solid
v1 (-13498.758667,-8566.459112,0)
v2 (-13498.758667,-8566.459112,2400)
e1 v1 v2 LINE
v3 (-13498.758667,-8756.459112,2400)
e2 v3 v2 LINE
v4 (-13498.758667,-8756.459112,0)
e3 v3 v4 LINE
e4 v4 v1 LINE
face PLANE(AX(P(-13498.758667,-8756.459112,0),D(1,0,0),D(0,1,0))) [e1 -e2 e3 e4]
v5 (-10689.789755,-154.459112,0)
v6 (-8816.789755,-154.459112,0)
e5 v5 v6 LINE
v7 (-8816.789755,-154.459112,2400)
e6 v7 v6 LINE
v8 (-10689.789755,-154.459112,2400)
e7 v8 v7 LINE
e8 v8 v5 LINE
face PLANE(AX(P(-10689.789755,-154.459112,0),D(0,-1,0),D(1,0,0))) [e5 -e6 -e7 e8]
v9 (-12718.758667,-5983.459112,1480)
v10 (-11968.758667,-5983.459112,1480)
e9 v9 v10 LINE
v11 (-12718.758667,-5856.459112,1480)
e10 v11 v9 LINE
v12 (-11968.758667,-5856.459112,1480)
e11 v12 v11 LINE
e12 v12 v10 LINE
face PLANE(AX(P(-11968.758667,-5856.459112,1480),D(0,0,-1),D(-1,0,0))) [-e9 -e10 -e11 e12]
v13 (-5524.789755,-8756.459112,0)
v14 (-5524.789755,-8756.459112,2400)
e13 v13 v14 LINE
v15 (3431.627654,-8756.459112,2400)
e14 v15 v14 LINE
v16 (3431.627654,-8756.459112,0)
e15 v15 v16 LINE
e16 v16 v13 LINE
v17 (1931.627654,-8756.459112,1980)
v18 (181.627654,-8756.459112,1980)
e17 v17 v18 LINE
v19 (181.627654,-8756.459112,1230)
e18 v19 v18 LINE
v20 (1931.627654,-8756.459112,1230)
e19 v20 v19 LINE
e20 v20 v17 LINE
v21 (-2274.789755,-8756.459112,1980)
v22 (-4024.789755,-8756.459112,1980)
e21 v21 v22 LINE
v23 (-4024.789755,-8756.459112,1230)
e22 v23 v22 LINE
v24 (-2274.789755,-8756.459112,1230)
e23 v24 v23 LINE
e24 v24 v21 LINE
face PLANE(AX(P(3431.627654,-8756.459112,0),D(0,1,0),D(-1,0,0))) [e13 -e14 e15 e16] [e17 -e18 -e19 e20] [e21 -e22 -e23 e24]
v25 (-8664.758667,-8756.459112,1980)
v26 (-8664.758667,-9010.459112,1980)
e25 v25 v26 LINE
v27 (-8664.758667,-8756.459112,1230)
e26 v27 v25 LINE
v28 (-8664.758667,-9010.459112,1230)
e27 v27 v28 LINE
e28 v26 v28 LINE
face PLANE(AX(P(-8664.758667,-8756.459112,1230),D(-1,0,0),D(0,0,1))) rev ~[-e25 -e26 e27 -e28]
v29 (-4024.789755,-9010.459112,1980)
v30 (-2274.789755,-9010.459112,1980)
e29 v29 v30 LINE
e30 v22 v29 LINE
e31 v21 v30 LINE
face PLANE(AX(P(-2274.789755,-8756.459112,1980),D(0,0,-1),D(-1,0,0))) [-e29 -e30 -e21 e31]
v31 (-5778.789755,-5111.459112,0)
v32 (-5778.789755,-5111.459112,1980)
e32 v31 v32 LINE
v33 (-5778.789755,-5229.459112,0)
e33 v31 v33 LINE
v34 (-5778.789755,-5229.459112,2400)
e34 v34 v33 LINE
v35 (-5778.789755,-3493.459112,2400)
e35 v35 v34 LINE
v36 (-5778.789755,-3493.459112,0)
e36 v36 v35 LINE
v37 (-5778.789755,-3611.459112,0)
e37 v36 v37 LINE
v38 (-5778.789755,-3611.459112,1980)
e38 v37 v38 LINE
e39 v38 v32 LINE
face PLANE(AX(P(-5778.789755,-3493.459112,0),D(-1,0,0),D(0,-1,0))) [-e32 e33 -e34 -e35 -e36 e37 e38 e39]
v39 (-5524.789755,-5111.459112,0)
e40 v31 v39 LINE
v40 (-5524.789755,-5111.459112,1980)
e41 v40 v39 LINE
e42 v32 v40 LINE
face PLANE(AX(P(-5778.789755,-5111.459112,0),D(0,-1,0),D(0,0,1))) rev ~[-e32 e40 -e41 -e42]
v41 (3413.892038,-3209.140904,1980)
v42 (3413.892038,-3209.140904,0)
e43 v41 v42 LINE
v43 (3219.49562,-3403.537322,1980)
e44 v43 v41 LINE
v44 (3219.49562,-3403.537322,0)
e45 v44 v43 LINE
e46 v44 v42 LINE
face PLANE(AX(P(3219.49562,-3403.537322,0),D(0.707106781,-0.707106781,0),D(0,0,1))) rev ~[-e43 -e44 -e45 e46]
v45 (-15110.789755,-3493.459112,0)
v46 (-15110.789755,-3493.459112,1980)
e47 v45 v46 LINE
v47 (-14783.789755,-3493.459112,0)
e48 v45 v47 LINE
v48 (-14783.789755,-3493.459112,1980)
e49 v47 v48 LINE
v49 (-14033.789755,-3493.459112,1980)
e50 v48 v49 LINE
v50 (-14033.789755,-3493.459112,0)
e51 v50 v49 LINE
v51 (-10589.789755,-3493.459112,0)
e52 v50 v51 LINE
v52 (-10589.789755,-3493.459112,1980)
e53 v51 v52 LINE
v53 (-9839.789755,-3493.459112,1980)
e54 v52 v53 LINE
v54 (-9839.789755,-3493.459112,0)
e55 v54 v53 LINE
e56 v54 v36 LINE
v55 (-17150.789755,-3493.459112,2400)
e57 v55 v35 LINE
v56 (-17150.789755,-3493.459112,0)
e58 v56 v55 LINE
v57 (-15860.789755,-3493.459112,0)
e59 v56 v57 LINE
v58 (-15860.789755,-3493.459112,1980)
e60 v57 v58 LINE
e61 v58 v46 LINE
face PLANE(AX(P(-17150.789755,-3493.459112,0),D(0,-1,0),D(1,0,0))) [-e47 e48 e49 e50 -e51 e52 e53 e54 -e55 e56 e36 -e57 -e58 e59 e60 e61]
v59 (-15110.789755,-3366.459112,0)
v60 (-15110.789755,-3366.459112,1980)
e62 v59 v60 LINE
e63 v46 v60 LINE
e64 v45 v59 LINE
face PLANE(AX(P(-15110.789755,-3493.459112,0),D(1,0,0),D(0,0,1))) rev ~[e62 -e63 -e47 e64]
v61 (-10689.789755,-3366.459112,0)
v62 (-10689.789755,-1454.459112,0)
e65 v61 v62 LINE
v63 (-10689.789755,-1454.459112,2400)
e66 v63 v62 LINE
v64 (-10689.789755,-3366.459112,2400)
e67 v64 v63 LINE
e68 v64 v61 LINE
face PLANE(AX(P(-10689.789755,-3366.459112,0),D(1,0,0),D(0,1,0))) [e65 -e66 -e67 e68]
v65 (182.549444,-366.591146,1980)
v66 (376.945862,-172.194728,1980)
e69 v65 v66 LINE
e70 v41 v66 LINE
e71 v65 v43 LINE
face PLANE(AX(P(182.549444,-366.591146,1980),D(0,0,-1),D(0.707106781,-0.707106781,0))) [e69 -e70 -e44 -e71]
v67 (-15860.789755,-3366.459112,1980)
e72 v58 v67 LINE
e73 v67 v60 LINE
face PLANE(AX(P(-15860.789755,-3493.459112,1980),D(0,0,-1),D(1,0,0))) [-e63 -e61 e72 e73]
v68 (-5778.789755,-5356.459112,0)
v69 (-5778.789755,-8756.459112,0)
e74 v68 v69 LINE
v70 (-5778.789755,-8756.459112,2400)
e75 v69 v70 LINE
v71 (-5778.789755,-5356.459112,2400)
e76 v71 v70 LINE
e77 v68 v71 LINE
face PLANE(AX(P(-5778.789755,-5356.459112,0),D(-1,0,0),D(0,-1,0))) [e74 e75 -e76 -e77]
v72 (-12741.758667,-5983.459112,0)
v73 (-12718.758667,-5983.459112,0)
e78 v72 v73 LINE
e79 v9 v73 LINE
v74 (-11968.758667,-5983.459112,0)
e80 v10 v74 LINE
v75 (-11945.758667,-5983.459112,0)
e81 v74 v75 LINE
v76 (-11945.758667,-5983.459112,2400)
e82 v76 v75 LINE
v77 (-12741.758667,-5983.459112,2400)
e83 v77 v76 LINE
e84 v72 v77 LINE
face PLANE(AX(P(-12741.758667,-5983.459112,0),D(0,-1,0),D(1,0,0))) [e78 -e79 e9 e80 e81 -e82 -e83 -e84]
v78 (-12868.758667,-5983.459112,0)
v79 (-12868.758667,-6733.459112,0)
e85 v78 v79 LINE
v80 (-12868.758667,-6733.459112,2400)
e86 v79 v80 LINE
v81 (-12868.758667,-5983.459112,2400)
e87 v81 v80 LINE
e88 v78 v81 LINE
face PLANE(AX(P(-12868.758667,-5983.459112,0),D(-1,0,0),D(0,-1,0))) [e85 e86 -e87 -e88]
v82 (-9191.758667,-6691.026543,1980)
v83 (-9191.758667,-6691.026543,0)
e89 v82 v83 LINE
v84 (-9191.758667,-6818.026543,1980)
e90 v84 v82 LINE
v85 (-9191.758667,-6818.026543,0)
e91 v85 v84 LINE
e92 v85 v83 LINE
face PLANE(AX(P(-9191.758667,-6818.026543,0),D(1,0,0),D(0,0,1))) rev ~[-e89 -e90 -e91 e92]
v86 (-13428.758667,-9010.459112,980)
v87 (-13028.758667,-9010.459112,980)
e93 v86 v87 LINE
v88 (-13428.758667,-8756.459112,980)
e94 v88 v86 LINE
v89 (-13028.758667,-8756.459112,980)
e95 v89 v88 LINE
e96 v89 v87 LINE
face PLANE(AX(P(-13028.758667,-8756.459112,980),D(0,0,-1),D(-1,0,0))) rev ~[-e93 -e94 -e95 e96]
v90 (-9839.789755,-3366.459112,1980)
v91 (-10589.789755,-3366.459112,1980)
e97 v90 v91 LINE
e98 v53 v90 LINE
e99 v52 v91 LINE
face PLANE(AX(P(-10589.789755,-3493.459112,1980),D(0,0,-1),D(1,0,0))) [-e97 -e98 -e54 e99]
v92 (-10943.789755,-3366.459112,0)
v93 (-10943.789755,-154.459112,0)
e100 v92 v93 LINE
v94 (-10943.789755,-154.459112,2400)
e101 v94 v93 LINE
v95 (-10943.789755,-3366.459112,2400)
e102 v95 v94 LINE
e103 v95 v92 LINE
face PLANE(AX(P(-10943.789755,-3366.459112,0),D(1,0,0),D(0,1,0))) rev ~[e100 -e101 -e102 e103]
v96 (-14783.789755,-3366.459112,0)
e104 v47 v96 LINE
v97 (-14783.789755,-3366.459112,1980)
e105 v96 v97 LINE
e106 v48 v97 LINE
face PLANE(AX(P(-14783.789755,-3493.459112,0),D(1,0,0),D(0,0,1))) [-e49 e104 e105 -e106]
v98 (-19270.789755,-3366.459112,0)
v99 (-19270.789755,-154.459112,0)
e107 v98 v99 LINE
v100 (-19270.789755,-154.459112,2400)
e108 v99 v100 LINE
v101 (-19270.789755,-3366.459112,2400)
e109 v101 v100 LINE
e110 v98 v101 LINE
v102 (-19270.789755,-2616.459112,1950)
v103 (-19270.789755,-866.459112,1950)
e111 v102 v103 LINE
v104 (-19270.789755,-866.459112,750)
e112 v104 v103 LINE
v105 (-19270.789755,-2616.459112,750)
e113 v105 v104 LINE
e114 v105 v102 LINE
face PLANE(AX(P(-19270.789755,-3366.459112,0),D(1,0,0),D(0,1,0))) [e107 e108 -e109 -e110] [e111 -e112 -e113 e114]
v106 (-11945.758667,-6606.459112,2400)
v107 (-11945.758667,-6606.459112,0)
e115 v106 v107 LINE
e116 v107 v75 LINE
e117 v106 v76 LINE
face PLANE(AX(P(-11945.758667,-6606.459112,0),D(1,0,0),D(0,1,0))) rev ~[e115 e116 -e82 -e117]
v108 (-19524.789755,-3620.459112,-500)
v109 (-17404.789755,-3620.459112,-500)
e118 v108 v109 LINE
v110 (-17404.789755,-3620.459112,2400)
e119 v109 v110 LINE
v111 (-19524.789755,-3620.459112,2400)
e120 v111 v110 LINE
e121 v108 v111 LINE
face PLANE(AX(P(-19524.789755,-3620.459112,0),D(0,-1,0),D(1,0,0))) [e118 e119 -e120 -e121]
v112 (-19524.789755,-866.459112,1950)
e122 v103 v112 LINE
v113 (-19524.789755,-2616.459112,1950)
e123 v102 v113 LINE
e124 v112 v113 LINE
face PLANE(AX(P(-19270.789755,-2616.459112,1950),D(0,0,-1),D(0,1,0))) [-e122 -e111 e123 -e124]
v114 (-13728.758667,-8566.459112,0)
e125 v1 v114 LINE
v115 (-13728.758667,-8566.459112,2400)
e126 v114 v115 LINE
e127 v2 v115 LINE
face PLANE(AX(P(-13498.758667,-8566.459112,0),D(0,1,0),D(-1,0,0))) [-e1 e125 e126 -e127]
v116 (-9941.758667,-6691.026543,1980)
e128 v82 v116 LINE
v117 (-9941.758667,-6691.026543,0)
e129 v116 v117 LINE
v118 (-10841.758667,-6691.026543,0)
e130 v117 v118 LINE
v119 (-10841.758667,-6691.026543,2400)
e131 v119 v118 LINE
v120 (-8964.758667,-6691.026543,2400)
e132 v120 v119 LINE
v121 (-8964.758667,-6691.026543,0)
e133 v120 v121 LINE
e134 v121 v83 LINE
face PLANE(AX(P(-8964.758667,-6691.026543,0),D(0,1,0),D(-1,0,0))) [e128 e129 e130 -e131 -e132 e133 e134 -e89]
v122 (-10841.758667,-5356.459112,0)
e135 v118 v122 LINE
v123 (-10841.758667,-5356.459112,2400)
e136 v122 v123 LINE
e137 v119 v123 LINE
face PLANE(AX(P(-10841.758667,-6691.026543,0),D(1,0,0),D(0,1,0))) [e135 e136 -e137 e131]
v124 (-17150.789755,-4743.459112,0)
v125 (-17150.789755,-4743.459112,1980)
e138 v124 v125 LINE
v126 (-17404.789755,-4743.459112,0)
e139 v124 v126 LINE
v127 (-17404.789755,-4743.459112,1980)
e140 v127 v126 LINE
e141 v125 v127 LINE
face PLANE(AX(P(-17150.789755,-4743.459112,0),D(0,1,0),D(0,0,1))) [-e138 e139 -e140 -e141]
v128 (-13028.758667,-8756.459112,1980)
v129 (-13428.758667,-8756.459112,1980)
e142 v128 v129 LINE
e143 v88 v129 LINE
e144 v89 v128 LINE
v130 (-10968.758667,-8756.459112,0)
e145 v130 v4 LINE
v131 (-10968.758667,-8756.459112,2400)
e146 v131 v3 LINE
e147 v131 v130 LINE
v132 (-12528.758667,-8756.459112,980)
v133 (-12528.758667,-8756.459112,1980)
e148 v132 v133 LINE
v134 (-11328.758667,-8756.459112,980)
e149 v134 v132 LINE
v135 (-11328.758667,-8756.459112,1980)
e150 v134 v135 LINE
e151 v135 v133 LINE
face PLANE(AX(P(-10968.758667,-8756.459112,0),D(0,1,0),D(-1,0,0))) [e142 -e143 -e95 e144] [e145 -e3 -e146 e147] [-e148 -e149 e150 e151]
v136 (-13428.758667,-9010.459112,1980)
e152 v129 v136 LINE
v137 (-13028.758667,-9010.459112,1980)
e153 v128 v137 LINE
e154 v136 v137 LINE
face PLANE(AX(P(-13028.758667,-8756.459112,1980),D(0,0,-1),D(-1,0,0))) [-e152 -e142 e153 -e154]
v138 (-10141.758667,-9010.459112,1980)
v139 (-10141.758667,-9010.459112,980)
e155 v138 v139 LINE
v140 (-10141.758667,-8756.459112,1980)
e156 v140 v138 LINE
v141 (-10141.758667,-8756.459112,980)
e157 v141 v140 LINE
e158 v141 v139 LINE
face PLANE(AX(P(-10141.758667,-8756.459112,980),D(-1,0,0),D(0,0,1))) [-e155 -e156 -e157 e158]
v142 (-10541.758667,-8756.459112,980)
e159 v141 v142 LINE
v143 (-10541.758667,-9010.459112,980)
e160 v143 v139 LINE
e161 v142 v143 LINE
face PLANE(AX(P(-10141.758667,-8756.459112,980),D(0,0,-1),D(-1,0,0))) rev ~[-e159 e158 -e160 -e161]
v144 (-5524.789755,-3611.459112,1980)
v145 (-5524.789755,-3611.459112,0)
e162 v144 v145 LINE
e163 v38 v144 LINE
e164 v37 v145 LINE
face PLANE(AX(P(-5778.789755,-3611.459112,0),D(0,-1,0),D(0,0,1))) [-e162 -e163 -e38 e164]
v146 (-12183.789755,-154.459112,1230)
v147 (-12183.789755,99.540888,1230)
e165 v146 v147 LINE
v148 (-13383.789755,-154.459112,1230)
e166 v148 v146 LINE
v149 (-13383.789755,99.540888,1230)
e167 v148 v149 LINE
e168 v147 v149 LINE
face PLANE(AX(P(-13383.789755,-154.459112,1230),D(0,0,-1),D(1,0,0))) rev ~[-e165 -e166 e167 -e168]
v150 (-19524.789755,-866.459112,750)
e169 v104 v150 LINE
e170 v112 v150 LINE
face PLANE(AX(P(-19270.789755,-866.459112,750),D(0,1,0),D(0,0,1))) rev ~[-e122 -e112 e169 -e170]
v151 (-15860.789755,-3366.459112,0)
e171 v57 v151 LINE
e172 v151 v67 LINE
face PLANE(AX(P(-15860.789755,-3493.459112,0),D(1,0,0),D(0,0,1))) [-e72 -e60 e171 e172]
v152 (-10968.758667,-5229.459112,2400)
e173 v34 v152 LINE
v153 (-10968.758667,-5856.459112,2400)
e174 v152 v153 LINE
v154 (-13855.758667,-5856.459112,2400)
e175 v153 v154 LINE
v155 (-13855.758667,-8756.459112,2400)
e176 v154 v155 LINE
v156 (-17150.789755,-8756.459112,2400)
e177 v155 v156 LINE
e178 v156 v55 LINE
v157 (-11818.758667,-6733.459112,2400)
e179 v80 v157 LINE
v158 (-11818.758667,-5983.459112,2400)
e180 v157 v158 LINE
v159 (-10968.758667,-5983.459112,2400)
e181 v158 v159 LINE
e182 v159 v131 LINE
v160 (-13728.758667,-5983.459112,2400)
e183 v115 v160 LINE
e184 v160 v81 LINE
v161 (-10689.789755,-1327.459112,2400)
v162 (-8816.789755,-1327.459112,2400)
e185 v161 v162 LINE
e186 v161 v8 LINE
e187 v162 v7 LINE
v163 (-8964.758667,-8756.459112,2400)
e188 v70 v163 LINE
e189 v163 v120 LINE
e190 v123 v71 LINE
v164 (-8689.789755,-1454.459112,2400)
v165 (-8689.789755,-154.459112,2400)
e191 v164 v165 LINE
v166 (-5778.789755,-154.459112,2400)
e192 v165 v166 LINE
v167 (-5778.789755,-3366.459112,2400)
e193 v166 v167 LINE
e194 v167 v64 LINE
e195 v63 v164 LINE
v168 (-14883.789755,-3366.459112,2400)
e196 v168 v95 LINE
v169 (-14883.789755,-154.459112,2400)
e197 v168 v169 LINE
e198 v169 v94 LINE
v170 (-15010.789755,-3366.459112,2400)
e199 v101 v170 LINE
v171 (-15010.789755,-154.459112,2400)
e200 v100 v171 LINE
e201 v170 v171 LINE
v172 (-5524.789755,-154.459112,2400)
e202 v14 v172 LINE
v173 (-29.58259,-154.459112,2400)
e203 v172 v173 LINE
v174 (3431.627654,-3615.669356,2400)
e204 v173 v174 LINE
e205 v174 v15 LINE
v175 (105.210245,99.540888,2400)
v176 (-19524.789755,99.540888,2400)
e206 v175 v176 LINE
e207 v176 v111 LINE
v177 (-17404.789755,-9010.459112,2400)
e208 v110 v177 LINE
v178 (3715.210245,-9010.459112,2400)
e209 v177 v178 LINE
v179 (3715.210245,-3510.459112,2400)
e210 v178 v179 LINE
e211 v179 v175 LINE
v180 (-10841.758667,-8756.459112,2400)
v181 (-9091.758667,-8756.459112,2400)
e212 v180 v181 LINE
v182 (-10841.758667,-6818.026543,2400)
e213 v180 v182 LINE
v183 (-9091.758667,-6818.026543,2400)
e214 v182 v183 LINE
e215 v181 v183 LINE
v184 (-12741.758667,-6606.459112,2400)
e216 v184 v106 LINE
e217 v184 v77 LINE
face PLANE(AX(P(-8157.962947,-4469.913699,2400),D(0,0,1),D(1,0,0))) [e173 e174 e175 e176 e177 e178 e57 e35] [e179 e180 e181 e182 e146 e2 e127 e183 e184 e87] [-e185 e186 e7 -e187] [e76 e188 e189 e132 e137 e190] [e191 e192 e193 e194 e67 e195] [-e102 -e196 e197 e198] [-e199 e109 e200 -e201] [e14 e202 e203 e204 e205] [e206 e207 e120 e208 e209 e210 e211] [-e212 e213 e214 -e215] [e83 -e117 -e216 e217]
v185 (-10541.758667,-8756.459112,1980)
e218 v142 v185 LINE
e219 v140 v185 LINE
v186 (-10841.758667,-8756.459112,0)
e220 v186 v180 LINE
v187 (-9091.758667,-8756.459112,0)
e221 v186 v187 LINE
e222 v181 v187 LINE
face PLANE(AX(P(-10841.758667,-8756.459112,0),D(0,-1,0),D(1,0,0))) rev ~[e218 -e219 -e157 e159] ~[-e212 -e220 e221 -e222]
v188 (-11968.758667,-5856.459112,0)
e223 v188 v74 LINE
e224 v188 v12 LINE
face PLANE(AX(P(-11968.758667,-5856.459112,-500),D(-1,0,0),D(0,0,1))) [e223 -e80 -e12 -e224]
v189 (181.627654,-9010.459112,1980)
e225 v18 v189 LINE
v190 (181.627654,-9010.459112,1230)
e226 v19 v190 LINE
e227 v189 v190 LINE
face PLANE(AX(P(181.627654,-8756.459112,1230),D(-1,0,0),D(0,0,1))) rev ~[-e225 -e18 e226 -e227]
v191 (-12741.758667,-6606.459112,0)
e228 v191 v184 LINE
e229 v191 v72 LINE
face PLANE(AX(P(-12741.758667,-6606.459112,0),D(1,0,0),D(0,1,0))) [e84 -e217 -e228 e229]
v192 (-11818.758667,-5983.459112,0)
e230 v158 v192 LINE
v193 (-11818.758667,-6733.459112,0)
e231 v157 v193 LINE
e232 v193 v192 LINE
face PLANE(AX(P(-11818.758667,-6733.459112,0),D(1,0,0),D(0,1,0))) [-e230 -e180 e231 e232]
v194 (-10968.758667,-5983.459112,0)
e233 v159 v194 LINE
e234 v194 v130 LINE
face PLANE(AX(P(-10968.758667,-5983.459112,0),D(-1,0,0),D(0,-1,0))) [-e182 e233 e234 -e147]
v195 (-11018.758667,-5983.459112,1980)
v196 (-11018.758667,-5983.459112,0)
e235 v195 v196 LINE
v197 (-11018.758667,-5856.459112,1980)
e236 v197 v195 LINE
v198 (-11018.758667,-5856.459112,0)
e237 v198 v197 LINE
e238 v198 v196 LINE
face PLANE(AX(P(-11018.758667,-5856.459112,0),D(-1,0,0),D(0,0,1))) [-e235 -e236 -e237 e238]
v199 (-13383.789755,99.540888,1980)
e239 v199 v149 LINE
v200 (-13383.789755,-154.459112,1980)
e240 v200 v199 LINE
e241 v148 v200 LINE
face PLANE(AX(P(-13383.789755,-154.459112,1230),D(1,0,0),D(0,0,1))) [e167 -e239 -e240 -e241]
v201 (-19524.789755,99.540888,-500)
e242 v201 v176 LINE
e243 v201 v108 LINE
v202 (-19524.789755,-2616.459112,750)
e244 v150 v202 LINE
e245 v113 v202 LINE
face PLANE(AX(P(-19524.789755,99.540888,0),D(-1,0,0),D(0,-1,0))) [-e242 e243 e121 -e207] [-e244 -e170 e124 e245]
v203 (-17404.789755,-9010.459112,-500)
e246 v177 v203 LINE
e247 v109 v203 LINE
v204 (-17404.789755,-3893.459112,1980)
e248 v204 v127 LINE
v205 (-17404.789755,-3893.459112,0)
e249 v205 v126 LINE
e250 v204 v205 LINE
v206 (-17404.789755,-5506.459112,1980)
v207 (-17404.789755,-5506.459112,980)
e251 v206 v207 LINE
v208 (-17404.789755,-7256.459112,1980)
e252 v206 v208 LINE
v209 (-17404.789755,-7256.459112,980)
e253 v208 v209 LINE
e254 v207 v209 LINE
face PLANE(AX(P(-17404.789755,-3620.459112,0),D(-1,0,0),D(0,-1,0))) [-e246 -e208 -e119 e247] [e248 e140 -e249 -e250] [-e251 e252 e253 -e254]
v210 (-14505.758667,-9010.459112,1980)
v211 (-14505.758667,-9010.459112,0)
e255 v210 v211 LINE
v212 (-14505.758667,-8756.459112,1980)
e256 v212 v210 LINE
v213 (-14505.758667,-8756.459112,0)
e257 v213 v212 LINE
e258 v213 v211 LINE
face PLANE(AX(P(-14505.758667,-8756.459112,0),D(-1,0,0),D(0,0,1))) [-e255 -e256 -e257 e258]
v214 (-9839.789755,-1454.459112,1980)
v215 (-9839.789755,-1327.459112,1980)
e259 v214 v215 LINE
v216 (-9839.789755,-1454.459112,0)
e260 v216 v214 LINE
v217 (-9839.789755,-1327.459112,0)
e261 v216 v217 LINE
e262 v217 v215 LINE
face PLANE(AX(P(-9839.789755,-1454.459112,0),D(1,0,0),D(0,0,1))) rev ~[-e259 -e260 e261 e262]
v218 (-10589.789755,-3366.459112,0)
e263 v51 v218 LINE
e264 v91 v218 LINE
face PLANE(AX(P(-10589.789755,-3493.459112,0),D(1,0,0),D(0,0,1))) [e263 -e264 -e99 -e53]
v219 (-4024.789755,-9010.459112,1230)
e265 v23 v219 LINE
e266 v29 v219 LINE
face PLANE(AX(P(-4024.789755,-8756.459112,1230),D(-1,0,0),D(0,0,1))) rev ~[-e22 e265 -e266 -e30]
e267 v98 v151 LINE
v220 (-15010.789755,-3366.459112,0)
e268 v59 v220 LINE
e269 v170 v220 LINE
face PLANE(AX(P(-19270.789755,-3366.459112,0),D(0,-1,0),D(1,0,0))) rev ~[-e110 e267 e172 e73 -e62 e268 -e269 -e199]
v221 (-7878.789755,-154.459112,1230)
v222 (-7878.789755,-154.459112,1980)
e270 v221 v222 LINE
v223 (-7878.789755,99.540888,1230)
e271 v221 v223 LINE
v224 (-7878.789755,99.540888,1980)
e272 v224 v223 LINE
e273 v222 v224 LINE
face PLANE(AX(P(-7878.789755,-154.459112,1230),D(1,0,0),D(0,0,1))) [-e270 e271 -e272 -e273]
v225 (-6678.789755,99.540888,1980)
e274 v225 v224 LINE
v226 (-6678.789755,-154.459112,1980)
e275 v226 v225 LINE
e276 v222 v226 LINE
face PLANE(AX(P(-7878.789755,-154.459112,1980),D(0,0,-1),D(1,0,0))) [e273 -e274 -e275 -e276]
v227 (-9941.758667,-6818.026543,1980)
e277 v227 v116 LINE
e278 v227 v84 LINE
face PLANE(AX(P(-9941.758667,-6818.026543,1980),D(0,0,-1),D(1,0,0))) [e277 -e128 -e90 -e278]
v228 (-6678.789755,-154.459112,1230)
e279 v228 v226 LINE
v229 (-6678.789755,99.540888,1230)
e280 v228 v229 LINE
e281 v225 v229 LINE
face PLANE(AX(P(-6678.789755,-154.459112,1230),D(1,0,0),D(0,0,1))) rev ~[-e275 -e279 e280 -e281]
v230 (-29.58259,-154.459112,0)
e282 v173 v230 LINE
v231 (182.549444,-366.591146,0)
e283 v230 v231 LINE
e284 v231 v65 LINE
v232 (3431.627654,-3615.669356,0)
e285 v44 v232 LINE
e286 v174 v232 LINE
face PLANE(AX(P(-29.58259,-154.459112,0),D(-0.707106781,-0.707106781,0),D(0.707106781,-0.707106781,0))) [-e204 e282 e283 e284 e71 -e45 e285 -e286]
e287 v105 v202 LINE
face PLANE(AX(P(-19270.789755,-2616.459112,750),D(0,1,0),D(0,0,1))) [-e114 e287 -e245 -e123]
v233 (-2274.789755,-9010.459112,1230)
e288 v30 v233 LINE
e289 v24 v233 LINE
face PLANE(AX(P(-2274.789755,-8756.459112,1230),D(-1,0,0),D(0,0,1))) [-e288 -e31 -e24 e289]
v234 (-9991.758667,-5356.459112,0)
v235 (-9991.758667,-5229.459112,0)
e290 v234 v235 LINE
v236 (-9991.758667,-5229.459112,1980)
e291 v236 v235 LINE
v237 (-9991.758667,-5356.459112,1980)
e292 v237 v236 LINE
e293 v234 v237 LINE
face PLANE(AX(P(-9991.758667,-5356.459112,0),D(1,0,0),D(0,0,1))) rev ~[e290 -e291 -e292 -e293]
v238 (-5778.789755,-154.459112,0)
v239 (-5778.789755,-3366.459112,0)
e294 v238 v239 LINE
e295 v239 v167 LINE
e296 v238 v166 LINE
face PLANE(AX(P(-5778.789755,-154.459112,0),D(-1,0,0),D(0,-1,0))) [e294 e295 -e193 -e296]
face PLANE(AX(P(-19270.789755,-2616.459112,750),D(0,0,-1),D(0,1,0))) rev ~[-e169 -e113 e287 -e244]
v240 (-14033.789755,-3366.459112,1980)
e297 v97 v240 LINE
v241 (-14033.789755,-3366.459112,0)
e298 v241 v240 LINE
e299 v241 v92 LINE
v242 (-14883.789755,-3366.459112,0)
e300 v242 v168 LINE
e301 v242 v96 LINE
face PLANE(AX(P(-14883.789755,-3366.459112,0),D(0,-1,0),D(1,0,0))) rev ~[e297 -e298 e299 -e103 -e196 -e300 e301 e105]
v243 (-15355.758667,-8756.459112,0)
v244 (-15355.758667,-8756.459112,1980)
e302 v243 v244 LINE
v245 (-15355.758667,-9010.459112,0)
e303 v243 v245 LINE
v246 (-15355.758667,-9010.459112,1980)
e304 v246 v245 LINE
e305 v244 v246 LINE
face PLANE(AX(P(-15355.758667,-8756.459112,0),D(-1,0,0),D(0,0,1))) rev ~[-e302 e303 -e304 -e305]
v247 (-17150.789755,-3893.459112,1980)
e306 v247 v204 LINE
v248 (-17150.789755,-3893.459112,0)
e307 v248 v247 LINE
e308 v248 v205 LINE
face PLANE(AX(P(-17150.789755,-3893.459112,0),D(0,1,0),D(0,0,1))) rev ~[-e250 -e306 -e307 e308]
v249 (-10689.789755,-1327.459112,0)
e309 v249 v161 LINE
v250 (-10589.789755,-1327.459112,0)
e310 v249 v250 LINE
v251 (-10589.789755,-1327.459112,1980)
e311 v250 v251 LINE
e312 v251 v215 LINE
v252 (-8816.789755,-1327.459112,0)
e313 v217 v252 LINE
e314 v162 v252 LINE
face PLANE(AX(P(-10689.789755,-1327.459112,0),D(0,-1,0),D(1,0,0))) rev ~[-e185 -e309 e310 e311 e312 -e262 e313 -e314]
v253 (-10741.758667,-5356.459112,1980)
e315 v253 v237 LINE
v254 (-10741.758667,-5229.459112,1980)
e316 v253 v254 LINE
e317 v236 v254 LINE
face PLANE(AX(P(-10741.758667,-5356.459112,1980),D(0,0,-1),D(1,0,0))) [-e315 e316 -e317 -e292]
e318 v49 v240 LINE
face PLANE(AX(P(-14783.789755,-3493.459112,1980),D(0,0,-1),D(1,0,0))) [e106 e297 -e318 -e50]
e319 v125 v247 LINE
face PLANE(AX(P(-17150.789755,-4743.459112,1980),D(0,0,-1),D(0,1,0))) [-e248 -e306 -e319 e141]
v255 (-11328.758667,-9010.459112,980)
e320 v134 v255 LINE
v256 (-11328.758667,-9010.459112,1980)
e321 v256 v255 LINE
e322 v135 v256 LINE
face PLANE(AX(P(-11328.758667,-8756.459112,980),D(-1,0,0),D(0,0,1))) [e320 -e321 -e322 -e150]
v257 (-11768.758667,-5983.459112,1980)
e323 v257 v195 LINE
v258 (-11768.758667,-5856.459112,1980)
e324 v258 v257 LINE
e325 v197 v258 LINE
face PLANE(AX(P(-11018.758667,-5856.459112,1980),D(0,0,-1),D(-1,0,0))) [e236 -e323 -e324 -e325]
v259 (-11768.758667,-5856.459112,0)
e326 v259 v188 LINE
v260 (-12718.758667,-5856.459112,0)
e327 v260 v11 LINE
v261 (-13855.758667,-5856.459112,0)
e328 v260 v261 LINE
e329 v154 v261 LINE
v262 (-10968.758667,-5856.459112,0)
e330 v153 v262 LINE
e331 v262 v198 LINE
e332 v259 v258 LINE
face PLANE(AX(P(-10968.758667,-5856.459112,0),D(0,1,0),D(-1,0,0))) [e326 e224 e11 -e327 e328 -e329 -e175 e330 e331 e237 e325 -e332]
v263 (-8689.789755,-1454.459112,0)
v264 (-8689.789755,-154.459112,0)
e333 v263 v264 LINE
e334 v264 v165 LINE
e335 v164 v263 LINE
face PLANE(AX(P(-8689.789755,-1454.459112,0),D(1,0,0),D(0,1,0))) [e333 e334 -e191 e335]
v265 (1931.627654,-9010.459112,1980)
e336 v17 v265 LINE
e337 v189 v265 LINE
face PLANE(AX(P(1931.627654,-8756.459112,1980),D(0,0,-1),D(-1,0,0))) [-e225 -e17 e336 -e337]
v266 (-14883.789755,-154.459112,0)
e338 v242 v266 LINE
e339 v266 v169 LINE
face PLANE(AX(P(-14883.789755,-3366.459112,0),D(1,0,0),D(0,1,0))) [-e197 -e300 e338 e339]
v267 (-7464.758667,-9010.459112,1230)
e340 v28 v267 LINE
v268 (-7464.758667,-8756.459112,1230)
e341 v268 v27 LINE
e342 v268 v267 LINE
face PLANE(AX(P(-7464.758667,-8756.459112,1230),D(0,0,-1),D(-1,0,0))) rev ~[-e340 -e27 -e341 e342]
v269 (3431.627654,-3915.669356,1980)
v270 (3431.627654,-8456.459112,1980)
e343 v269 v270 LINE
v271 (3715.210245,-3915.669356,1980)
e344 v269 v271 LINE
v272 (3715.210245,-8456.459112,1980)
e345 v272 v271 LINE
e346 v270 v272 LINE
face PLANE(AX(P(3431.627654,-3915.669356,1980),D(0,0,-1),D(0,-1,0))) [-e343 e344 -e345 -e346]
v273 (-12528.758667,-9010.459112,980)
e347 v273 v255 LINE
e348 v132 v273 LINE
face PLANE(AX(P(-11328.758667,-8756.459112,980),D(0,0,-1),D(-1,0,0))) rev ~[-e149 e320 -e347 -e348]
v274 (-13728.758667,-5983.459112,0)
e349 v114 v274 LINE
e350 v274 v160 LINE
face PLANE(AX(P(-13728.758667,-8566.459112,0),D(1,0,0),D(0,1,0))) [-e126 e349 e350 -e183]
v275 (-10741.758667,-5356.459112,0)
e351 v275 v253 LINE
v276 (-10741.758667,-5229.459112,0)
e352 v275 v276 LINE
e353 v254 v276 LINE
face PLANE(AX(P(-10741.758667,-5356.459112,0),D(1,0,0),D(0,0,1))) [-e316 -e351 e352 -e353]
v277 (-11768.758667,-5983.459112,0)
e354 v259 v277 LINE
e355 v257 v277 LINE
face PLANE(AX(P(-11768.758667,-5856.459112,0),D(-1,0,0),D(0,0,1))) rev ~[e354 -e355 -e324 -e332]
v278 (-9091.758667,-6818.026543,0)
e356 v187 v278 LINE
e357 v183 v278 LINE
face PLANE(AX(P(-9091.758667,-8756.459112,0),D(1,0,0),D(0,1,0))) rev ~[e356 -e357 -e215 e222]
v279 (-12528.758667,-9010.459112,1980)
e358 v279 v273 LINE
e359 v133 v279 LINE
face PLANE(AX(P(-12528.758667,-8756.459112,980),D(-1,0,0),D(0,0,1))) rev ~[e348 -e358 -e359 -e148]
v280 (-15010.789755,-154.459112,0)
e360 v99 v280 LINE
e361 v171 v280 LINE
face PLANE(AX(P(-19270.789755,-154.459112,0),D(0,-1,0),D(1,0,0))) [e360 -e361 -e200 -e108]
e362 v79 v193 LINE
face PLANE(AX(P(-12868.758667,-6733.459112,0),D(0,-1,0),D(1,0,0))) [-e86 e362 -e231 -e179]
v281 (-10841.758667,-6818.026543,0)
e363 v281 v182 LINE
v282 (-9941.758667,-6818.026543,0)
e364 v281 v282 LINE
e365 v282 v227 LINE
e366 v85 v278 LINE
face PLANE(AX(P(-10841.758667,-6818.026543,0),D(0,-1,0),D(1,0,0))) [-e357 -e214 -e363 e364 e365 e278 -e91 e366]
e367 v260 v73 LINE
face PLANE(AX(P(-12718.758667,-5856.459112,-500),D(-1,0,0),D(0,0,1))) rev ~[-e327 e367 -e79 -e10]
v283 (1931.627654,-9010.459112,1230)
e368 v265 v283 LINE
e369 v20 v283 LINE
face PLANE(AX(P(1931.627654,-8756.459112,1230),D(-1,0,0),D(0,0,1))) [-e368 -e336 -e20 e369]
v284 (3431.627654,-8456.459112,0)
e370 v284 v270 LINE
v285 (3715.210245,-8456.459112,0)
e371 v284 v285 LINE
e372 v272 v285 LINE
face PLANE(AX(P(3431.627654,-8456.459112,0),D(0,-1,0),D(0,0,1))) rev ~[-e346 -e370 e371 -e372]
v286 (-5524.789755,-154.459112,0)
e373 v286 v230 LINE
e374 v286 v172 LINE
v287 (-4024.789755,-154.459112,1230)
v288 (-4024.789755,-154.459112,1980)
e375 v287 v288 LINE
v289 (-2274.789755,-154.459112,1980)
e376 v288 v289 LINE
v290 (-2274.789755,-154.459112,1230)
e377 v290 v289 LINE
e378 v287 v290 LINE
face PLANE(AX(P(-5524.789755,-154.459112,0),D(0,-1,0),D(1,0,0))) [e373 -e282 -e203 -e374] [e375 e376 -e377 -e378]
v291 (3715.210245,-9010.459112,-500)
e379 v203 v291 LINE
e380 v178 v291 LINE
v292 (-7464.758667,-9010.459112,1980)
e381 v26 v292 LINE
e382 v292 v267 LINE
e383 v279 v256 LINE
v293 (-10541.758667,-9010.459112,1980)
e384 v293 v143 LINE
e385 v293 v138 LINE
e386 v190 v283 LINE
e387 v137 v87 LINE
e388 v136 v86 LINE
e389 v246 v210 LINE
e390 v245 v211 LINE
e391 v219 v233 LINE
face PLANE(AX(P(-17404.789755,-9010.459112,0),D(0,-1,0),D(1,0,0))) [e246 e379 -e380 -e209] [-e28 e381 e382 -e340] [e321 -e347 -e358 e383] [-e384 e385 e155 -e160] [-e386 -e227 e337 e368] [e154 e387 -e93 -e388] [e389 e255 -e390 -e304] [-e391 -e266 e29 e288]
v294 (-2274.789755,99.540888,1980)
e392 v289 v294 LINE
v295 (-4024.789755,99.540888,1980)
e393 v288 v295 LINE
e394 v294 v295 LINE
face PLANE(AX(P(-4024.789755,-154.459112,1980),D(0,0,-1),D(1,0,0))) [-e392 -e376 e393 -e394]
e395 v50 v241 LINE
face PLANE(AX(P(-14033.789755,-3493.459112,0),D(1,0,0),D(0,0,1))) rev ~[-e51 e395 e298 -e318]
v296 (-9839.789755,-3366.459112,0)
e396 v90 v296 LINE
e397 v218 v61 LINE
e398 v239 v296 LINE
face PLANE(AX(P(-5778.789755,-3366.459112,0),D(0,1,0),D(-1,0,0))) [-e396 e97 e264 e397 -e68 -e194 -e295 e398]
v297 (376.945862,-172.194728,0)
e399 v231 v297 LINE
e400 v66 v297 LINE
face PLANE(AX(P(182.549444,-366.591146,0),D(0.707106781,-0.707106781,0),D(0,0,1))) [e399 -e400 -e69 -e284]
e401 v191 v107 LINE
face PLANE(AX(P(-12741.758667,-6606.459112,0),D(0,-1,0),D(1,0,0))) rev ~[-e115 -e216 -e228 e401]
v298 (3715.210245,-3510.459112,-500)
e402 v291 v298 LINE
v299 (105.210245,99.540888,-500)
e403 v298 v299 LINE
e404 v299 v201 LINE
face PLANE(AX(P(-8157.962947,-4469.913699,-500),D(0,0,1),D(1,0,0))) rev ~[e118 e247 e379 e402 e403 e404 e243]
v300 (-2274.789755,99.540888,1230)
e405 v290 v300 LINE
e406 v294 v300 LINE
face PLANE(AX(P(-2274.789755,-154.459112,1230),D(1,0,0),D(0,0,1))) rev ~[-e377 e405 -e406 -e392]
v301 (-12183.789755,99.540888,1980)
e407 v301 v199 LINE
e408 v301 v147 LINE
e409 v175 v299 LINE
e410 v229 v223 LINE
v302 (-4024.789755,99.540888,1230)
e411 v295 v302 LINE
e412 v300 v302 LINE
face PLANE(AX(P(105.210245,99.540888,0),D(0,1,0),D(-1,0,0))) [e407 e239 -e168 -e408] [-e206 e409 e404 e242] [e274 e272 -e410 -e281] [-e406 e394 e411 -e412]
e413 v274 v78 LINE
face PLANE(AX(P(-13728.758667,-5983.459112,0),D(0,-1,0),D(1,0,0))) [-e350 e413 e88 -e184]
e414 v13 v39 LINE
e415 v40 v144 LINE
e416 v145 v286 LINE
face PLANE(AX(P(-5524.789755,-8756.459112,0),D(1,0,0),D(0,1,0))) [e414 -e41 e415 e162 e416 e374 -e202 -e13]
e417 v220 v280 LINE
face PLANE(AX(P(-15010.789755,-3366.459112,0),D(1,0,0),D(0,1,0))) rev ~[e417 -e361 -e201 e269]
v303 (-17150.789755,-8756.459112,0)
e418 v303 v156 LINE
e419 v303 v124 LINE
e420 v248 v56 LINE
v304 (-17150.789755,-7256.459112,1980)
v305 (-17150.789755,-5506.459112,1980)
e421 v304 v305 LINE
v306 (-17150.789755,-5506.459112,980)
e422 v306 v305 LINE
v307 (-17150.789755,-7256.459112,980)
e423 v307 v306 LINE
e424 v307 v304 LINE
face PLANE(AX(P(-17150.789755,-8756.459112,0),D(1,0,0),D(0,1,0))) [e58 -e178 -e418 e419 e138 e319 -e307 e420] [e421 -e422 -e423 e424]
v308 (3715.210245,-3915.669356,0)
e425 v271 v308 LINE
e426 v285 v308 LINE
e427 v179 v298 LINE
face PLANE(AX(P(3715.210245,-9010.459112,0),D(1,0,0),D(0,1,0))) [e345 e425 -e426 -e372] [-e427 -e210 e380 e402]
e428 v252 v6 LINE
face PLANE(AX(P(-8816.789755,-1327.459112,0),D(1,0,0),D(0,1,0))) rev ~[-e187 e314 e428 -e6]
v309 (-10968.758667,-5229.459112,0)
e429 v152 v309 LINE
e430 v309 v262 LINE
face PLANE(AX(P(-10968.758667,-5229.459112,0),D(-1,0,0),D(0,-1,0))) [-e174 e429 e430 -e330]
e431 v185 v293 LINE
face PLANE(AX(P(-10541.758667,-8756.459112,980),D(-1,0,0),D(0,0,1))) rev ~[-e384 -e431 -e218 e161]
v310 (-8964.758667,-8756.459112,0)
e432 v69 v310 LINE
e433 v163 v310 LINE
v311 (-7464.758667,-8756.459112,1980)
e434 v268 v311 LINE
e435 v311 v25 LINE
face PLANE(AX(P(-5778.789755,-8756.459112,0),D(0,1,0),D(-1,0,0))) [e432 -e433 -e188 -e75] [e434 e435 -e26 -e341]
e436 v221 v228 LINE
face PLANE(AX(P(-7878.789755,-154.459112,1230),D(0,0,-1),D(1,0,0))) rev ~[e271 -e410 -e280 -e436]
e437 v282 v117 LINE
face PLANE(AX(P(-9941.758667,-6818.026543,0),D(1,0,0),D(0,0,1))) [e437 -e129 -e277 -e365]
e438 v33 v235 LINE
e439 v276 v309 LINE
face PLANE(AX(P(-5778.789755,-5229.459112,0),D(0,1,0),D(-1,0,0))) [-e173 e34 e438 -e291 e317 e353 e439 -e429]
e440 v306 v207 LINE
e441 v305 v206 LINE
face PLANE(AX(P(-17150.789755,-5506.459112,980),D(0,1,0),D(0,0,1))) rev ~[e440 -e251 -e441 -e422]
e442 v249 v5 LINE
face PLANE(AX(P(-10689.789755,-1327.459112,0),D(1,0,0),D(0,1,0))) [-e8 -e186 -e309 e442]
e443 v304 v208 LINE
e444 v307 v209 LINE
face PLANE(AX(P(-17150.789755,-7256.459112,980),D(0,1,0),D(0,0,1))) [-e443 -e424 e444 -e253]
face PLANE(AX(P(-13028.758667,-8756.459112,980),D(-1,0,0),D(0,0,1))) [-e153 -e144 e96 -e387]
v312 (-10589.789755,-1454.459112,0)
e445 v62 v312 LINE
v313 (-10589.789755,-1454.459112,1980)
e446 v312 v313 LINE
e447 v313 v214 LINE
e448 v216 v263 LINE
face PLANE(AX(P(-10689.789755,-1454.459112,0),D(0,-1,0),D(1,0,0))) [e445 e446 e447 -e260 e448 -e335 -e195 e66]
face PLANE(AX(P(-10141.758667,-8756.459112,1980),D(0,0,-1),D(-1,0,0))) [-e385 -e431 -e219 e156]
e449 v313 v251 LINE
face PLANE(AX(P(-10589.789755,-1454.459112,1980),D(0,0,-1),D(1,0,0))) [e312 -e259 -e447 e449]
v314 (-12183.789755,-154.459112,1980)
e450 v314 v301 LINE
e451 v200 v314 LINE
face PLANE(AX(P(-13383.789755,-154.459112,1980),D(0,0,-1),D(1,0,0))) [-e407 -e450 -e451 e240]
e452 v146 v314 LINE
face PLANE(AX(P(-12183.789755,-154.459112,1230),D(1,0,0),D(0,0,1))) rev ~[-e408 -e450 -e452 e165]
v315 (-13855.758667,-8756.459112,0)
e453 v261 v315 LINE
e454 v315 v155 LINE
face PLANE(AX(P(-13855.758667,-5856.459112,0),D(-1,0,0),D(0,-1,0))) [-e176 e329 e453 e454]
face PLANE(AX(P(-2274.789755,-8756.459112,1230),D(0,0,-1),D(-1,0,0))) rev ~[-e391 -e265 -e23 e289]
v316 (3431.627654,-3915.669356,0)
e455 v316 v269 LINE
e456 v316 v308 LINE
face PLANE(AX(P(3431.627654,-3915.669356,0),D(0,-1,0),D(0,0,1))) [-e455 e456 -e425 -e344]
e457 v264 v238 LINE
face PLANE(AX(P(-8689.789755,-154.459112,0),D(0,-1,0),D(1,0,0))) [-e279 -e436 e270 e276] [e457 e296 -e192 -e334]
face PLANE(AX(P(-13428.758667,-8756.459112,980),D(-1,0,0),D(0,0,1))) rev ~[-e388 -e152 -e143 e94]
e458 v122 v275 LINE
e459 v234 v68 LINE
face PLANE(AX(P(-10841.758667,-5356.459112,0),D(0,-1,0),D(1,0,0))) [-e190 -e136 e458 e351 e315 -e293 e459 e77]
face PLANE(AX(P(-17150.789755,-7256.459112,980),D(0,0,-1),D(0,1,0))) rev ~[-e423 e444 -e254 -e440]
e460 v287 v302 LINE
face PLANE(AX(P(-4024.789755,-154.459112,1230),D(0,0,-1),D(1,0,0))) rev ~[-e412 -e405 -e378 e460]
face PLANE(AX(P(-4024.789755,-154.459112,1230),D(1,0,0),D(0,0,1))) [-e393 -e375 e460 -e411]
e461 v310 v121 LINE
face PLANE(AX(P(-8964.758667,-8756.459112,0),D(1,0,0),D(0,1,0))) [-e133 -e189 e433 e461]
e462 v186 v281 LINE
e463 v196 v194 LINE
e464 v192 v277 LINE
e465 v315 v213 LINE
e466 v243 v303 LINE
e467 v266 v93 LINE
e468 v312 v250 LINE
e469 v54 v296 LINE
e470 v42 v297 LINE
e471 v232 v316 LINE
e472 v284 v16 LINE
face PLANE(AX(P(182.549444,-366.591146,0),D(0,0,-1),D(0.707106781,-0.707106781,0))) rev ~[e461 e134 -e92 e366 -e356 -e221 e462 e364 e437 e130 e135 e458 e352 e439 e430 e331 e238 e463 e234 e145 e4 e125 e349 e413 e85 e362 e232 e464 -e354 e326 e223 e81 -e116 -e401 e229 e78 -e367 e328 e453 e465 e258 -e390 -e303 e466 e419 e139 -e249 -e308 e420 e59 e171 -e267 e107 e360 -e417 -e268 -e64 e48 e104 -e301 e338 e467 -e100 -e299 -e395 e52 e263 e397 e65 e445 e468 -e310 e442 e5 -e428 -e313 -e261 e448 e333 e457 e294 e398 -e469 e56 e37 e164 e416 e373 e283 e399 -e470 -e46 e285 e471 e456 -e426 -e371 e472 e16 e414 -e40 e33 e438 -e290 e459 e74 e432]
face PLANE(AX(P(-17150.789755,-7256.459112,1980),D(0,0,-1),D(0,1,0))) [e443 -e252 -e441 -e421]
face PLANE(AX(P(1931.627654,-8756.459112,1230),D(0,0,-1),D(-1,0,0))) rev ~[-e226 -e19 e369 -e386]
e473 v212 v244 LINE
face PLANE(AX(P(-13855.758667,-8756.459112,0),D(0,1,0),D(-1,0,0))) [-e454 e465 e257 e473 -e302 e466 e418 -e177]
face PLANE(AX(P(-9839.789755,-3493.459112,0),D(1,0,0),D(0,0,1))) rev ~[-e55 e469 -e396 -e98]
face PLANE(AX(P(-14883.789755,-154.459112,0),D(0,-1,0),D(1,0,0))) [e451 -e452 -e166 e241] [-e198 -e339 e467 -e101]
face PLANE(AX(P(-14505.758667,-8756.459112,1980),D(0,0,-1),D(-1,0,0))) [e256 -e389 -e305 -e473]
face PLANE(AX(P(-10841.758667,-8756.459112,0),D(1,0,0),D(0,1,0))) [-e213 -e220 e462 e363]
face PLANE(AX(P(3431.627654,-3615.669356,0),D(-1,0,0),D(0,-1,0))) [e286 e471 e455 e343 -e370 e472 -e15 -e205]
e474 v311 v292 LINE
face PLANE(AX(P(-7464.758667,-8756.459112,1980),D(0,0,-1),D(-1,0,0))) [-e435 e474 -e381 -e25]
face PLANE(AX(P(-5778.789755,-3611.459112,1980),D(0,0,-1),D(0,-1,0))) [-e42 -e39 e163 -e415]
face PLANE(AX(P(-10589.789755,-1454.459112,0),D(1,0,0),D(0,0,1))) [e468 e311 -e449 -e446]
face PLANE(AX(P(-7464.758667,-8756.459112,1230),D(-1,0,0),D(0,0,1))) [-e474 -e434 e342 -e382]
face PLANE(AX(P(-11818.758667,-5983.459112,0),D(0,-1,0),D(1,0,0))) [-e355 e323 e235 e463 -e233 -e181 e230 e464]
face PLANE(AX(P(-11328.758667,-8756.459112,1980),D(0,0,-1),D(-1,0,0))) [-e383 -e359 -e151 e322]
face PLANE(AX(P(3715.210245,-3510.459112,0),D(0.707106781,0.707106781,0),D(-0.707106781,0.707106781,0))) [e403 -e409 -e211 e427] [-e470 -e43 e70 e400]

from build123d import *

# Parameters (mm, degrees)
F0_W          = 1750
F0_H          = 1938.4325688744
F0_W_2        = 796
F0_H_2        = 623
F0_W_3        = 4260
F0_H_3        = 3212
F0_W_4        = 3940
F0_W_5        = 1873
F0_H_4        = 1173
F1_DEPTH      = 2400
F1_DEPTH_BACK = 500
F2_W          = 750
F2_H          = 1980
F3_DEPTH      = 250
F4_W          = 750
F4_H          = 1980
F5_DEPTH      = 500
F6_W          = 750
F6_H          = 1980
F7_DEPTH      = 500
F8_W          = 1500
F8_H          = 1980
F9_DEPTH      = 500
F12_DEPTH     = 500
F13_W         = 750
F13_H         = 1980
F14_DEPTH     = 500
F15_W         = 1750
F15_H         = 1000
F15_W_2       = 850
F15_H_2       = 1980
F16_DEPTH     = 2374.001
F17_W         = 1750
F17_H         = 1200
F18_DEPTH     = 254.001
F19_W         = 850
F19_H         = 1980
F20_DEPTH     = 254.001
F21_W         = 400
F21_H         = 1000
F21_W_2       = 1200
F21_H_2       = 750
F21_W_3       = 1750
F22_DEPTH     = 254.001
F23_W         = 1200
F23_H         = 750
F23_W_2       = 1750
F24_DEPTH     = 254.001
F25_W         = 4294.8904704813
F25_H         = 1980
F26_DEPTH     = 2827.5745303553
F27_W         = 4540.7897551572
F27_H         = 1980
F28_DEPTH     = 283.5835903928
F29_W         = 750
F29_H         = 1980
F30_DEPTH     = 500


# Not quite as in the source:
# - a feature names something its author has since deleted; it is built from what else it names


with BuildPart() as f1:
    # F0 (on Top) → F1 (new body, two sides)
    with BuildSketch(Plane.XY) as f1_sk:
        Polygon((105.2102448428, 99.540888462), (-19524.7897551572, 99.540888462), (-19524.7897551572, -3620.459111538), (-17404.7897551572, -3620.459111538), (-17404.7897551572, -9010.459111538), (3715.2102448428, -9010.459111538), (3715.2102448428, -3510.459111538), align=None)
        Polygon((-13498.7586669922, -8566.459111538), (-13728.7586669922, -8566.459111538), (-13728.7586669922, -5983.459111538), (-12868.7586669922, -5983.459111538), (-12868.7586669922, -6733.459111538), (-11818.7586669922, -6733.459111538), (-11818.7586669922, -5983.459111538), (-10968.7586669922, -5983.459111538), (-10968.7586669922, -8756.459111538), (-13498.7586669922, -8756.459111538), align=None, mode=Mode.SUBTRACT)
        with Locations((-9966.7586669922, -7787.2428271008)):
            Rectangle(F0_W, F0_H, mode=Mode.SUBTRACT)
        Polygon((-10841.7586669922, -5356.459111538), (-5778.7897551572, -5356.459111538), (-5778.7897551572, -8756.459111538), (-8964.7586669922, -8756.459111538), (-8964.7586669922, -6691.0265426636), (-10841.7586669922, -6691.0265426636), align=None, mode=Mode.SUBTRACT)
        with Locations((-12343.7586669922, -6294.959111538)):
            Rectangle(F0_W_2, F0_H_2, mode=Mode.SUBTRACT)
        Polygon((-13855.7586669922, -8756.459111538), (-17150.7897551572, -8756.459111538), (-17150.7897551572, -3493.459111538), (-5778.7897551572, -3493.459111538), (-5778.7897551572, -5229.459111538), (-10968.7586669922, -5229.459111538), (-10968.7586669922, -5856.459111538), (-13855.7586669922, -5856.459111538), align=None, mode=Mode.SUBTRACT)
        Polygon((-5524.7897551572, -8756.459111538), (-5524.7897551572, -154.459111538), (-29.5825903928, -154.459111538), (3431.6276544499, -3615.6693563807), (3431.6276544499, -8756.459111538), align=None, mode=Mode.SUBTRACT)
        with Locations((-17140.7897551572, -1760.459111538)):
            Rectangle(F0_W_3, F0_H_3, mode=Mode.SUBTRACT)
        with Locations((-12913.7897551572, -1760.459111538)):
            Rectangle(F0_W_4, F0_H_3, mode=Mode.SUBTRACT)
        Polygon((-8689.7897551572, -154.459111538), (-5778.7897551572, -154.459111538), (-5778.7897551572, -3366.459111538), (-10689.7897551572, -3366.459111538), (-10689.7897551572, -1454.459111538), (-8689.7897551572, -1454.459111538), align=None, mode=Mode.SUBTRACT)
        with Locations((-9753.2897551572, -740.959111538)):
            Rectangle(F0_W_5, F0_H_4, mode=Mode.SUBTRACT)
    extrude(amount=F1_DEPTH)
    extrude(f1_sk.sketch, amount=-F1_DEPTH_BACK)

    # F2 (on face) → F3 (cut)
    with BuildSketch(Plane(origin=(0, -5856.459111538, 0), x_dir=(-1, 0, 0), z_dir=(0, 1, 0))):
        with Locations((11393.7586669922, 990)):
            Rectangle(F2_W, F2_H)
        with Locations((12343.7586669922, 490)):
            Rectangle(F2_W, F2_H)
    extrude(amount=-F3_DEPTH, mode=Mode.SUBTRACT)

    # F4 (on face) → F5 (cut)
    with BuildSketch(Plane.XZ.offset(3493.459111538)):
        with Locations((-15485.7897551572, 990)):
            Rectangle(F4_W, F4_H)
        with Locations((-14408.7897551572, 990)):
            Rectangle(F4_W, F4_H)
        with Locations((-10214.7897551572, 990)):
            Rectangle(F4_W, F4_H)
    extrude(amount=-F5_DEPTH, mode=Mode.SUBTRACT)

    # F6 (on face) → F7 (cut)
    with BuildSketch(Plane.XZ.offset(5356.459111538)):
        with Locations((-10366.7586669922, 990)):
            Rectangle(F6_W, F6_H)
    extrude(amount=-F7_DEPTH, mode=Mode.SUBTRACT)

    # F8 (on face) → F9 (cut)
    with BuildSketch(Plane(origin=(-5778.7897551572, 0, 0), x_dir=(0, -1, 0), z_dir=(-1, 0, 0))):
        with Locations((4361.459111538, 990)):
            Rectangle(F8_W, F8_H)
    extrude(amount=-F9_DEPTH, mode=Mode.SUBTRACT)

    # F11 (on face) → F12 (join)
    with BuildSketch(Plane(origin=(0, 0, -500), x_dir=(1, 0, 0), z_dir=(0, 0, -1))):
        Polygon((3715.2102448428, 3510.459111538), (3715.2102448428, 9010.459111538), (-17404.7897551572, 9010.459111538), (-17404.7897551572, 3620.459111538), (-19524.7897551572, 3620.459111538), (-19524.7897551572, -99.540888462), (105.2102448428, -99.540888462), align=None)
    extrude(amount=-F12_DEPTH)

    # F13 (on face) → F14 (cut)
    with BuildSketch(Plane.XZ.offset(6818.0265426636)):
        with Locations((-9566.7586669922, 990)):
            Rectangle(F13_W, F13_H)
    extrude(amount=-F14_DEPTH, mode=Mode.SUBTRACT)

    # F15 (on face) → F16 (cut, through all)
    with BuildSketch(Plane.YZ.offset(-17150.7897551572)):
        with Locations((-6381.459111538, 1480)):
            Rectangle(F15_W, F15_H)
        with Locations((-4318.459111538, 990)):
            Rectangle(F15_W_2, F15_H_2)
    extrude(amount=-F16_DEPTH, mode=Mode.SUBTRACT)

    # F17 (on face) → F18 (cut, through all)
    with BuildSketch(Plane.YZ.offset(-19270.7897551572)):
        with Locations((-1741.459111538, 1350)):
            Rectangle(F17_W, F17_H)
    extrude(amount=-F18_DEPTH, mode=Mode.SUBTRACT)

    # F19 (on face) → F20 (cut, through all)
    with BuildSketch(Plane(origin=(0, -8756.459111538, 0), x_dir=(-1, 0, 0), z_dir=(0, 1, 0))):
        with Locations((14930.7586669922, 990)):
            Rectangle(F19_W, F19_H)
    extrude(amount=-F20_DEPTH, mode=Mode.SUBTRACT)

    # F21 (on face) → F22 (cut, through all)
    with BuildSketch(Plane(origin=(0, -8756.459111538, 0), x_dir=(-1, 0, 0), z_dir=(0, 1, 0))):
        with Locations((13228.7586669922, 1480)):
            Rectangle(F21_W, F21_H)
        with Locations((11928.7586669922, 1480)):
            Rectangle(F21_W_2, F21_H)
        with Locations((10341.7586669922, 1480)):
            Rectangle(F21_W, F21_H)
        with Locations((8064.7586669922, 1605)):
            Rectangle(F21_W_2, F21_H_2)
        with Locations((3149.7897551572, 1605)):
            Rectangle(F21_W_3, F21_H_2)
        with Locations((-1056.6276544499, 1605)):
            Rectangle(F21_W_3, F21_H_2)
    extrude(amount=-F22_DEPTH, mode=Mode.SUBTRACT)

    # F23 (on face) → F24 (cut, through all)
    with BuildSketch(Plane.XZ.offset(154.459111538)):
        with Locations((-12783.7897551572, 1605)):
            Rectangle(F23_W, F23_H)
        with Locations((-7278.7897551572, 1605)):
            Rectangle(F23_W, F23_H)
        with Locations((-3149.7897551572, 1605)):
            Rectangle(F23_W_2, F23_H)
    extrude(amount=-F24_DEPTH, mode=Mode.SUBTRACT)

    # F25 (on face) → F26 (cut, through all)
    with BuildSketch(Plane(origin=(-92.0208509654, -92.0208509654, 0), x_dir=(0.7071067812, -0.7071067812, 0), z_dir=(-0.7071067812, -0.7071067812, 0))):
        with Locations((2535.7462701534, 990)):
            Rectangle(F25_W, F25_H)
    extrude(amount=-F26_DEPTH, mode=Mode.SUBTRACT)

    # F27 (on face) → F28 (cut, through all)
    with BuildSketch(Plane(origin=(3431.6276544499, 0, 0), x_dir=(0, -1, 0), z_dir=(-1, 0, 0))):
        with Locations((6186.0642339594, 990)):
            Rectangle(F27_W, F27_H)
    extrude(amount=-F28_DEPTH, mode=Mode.SUBTRACT)

    # F29 (on face) → F30 (cut)
    with BuildSketch(Plane.XZ.offset(1454.459111538)):
        with Locations((-10214.7897551572, 990)):
            Rectangle(F29_W, F29_H)
    extrude(amount=-F30_DEPTH, mode=Mode.SUBTRACT)


solid = f1.part
